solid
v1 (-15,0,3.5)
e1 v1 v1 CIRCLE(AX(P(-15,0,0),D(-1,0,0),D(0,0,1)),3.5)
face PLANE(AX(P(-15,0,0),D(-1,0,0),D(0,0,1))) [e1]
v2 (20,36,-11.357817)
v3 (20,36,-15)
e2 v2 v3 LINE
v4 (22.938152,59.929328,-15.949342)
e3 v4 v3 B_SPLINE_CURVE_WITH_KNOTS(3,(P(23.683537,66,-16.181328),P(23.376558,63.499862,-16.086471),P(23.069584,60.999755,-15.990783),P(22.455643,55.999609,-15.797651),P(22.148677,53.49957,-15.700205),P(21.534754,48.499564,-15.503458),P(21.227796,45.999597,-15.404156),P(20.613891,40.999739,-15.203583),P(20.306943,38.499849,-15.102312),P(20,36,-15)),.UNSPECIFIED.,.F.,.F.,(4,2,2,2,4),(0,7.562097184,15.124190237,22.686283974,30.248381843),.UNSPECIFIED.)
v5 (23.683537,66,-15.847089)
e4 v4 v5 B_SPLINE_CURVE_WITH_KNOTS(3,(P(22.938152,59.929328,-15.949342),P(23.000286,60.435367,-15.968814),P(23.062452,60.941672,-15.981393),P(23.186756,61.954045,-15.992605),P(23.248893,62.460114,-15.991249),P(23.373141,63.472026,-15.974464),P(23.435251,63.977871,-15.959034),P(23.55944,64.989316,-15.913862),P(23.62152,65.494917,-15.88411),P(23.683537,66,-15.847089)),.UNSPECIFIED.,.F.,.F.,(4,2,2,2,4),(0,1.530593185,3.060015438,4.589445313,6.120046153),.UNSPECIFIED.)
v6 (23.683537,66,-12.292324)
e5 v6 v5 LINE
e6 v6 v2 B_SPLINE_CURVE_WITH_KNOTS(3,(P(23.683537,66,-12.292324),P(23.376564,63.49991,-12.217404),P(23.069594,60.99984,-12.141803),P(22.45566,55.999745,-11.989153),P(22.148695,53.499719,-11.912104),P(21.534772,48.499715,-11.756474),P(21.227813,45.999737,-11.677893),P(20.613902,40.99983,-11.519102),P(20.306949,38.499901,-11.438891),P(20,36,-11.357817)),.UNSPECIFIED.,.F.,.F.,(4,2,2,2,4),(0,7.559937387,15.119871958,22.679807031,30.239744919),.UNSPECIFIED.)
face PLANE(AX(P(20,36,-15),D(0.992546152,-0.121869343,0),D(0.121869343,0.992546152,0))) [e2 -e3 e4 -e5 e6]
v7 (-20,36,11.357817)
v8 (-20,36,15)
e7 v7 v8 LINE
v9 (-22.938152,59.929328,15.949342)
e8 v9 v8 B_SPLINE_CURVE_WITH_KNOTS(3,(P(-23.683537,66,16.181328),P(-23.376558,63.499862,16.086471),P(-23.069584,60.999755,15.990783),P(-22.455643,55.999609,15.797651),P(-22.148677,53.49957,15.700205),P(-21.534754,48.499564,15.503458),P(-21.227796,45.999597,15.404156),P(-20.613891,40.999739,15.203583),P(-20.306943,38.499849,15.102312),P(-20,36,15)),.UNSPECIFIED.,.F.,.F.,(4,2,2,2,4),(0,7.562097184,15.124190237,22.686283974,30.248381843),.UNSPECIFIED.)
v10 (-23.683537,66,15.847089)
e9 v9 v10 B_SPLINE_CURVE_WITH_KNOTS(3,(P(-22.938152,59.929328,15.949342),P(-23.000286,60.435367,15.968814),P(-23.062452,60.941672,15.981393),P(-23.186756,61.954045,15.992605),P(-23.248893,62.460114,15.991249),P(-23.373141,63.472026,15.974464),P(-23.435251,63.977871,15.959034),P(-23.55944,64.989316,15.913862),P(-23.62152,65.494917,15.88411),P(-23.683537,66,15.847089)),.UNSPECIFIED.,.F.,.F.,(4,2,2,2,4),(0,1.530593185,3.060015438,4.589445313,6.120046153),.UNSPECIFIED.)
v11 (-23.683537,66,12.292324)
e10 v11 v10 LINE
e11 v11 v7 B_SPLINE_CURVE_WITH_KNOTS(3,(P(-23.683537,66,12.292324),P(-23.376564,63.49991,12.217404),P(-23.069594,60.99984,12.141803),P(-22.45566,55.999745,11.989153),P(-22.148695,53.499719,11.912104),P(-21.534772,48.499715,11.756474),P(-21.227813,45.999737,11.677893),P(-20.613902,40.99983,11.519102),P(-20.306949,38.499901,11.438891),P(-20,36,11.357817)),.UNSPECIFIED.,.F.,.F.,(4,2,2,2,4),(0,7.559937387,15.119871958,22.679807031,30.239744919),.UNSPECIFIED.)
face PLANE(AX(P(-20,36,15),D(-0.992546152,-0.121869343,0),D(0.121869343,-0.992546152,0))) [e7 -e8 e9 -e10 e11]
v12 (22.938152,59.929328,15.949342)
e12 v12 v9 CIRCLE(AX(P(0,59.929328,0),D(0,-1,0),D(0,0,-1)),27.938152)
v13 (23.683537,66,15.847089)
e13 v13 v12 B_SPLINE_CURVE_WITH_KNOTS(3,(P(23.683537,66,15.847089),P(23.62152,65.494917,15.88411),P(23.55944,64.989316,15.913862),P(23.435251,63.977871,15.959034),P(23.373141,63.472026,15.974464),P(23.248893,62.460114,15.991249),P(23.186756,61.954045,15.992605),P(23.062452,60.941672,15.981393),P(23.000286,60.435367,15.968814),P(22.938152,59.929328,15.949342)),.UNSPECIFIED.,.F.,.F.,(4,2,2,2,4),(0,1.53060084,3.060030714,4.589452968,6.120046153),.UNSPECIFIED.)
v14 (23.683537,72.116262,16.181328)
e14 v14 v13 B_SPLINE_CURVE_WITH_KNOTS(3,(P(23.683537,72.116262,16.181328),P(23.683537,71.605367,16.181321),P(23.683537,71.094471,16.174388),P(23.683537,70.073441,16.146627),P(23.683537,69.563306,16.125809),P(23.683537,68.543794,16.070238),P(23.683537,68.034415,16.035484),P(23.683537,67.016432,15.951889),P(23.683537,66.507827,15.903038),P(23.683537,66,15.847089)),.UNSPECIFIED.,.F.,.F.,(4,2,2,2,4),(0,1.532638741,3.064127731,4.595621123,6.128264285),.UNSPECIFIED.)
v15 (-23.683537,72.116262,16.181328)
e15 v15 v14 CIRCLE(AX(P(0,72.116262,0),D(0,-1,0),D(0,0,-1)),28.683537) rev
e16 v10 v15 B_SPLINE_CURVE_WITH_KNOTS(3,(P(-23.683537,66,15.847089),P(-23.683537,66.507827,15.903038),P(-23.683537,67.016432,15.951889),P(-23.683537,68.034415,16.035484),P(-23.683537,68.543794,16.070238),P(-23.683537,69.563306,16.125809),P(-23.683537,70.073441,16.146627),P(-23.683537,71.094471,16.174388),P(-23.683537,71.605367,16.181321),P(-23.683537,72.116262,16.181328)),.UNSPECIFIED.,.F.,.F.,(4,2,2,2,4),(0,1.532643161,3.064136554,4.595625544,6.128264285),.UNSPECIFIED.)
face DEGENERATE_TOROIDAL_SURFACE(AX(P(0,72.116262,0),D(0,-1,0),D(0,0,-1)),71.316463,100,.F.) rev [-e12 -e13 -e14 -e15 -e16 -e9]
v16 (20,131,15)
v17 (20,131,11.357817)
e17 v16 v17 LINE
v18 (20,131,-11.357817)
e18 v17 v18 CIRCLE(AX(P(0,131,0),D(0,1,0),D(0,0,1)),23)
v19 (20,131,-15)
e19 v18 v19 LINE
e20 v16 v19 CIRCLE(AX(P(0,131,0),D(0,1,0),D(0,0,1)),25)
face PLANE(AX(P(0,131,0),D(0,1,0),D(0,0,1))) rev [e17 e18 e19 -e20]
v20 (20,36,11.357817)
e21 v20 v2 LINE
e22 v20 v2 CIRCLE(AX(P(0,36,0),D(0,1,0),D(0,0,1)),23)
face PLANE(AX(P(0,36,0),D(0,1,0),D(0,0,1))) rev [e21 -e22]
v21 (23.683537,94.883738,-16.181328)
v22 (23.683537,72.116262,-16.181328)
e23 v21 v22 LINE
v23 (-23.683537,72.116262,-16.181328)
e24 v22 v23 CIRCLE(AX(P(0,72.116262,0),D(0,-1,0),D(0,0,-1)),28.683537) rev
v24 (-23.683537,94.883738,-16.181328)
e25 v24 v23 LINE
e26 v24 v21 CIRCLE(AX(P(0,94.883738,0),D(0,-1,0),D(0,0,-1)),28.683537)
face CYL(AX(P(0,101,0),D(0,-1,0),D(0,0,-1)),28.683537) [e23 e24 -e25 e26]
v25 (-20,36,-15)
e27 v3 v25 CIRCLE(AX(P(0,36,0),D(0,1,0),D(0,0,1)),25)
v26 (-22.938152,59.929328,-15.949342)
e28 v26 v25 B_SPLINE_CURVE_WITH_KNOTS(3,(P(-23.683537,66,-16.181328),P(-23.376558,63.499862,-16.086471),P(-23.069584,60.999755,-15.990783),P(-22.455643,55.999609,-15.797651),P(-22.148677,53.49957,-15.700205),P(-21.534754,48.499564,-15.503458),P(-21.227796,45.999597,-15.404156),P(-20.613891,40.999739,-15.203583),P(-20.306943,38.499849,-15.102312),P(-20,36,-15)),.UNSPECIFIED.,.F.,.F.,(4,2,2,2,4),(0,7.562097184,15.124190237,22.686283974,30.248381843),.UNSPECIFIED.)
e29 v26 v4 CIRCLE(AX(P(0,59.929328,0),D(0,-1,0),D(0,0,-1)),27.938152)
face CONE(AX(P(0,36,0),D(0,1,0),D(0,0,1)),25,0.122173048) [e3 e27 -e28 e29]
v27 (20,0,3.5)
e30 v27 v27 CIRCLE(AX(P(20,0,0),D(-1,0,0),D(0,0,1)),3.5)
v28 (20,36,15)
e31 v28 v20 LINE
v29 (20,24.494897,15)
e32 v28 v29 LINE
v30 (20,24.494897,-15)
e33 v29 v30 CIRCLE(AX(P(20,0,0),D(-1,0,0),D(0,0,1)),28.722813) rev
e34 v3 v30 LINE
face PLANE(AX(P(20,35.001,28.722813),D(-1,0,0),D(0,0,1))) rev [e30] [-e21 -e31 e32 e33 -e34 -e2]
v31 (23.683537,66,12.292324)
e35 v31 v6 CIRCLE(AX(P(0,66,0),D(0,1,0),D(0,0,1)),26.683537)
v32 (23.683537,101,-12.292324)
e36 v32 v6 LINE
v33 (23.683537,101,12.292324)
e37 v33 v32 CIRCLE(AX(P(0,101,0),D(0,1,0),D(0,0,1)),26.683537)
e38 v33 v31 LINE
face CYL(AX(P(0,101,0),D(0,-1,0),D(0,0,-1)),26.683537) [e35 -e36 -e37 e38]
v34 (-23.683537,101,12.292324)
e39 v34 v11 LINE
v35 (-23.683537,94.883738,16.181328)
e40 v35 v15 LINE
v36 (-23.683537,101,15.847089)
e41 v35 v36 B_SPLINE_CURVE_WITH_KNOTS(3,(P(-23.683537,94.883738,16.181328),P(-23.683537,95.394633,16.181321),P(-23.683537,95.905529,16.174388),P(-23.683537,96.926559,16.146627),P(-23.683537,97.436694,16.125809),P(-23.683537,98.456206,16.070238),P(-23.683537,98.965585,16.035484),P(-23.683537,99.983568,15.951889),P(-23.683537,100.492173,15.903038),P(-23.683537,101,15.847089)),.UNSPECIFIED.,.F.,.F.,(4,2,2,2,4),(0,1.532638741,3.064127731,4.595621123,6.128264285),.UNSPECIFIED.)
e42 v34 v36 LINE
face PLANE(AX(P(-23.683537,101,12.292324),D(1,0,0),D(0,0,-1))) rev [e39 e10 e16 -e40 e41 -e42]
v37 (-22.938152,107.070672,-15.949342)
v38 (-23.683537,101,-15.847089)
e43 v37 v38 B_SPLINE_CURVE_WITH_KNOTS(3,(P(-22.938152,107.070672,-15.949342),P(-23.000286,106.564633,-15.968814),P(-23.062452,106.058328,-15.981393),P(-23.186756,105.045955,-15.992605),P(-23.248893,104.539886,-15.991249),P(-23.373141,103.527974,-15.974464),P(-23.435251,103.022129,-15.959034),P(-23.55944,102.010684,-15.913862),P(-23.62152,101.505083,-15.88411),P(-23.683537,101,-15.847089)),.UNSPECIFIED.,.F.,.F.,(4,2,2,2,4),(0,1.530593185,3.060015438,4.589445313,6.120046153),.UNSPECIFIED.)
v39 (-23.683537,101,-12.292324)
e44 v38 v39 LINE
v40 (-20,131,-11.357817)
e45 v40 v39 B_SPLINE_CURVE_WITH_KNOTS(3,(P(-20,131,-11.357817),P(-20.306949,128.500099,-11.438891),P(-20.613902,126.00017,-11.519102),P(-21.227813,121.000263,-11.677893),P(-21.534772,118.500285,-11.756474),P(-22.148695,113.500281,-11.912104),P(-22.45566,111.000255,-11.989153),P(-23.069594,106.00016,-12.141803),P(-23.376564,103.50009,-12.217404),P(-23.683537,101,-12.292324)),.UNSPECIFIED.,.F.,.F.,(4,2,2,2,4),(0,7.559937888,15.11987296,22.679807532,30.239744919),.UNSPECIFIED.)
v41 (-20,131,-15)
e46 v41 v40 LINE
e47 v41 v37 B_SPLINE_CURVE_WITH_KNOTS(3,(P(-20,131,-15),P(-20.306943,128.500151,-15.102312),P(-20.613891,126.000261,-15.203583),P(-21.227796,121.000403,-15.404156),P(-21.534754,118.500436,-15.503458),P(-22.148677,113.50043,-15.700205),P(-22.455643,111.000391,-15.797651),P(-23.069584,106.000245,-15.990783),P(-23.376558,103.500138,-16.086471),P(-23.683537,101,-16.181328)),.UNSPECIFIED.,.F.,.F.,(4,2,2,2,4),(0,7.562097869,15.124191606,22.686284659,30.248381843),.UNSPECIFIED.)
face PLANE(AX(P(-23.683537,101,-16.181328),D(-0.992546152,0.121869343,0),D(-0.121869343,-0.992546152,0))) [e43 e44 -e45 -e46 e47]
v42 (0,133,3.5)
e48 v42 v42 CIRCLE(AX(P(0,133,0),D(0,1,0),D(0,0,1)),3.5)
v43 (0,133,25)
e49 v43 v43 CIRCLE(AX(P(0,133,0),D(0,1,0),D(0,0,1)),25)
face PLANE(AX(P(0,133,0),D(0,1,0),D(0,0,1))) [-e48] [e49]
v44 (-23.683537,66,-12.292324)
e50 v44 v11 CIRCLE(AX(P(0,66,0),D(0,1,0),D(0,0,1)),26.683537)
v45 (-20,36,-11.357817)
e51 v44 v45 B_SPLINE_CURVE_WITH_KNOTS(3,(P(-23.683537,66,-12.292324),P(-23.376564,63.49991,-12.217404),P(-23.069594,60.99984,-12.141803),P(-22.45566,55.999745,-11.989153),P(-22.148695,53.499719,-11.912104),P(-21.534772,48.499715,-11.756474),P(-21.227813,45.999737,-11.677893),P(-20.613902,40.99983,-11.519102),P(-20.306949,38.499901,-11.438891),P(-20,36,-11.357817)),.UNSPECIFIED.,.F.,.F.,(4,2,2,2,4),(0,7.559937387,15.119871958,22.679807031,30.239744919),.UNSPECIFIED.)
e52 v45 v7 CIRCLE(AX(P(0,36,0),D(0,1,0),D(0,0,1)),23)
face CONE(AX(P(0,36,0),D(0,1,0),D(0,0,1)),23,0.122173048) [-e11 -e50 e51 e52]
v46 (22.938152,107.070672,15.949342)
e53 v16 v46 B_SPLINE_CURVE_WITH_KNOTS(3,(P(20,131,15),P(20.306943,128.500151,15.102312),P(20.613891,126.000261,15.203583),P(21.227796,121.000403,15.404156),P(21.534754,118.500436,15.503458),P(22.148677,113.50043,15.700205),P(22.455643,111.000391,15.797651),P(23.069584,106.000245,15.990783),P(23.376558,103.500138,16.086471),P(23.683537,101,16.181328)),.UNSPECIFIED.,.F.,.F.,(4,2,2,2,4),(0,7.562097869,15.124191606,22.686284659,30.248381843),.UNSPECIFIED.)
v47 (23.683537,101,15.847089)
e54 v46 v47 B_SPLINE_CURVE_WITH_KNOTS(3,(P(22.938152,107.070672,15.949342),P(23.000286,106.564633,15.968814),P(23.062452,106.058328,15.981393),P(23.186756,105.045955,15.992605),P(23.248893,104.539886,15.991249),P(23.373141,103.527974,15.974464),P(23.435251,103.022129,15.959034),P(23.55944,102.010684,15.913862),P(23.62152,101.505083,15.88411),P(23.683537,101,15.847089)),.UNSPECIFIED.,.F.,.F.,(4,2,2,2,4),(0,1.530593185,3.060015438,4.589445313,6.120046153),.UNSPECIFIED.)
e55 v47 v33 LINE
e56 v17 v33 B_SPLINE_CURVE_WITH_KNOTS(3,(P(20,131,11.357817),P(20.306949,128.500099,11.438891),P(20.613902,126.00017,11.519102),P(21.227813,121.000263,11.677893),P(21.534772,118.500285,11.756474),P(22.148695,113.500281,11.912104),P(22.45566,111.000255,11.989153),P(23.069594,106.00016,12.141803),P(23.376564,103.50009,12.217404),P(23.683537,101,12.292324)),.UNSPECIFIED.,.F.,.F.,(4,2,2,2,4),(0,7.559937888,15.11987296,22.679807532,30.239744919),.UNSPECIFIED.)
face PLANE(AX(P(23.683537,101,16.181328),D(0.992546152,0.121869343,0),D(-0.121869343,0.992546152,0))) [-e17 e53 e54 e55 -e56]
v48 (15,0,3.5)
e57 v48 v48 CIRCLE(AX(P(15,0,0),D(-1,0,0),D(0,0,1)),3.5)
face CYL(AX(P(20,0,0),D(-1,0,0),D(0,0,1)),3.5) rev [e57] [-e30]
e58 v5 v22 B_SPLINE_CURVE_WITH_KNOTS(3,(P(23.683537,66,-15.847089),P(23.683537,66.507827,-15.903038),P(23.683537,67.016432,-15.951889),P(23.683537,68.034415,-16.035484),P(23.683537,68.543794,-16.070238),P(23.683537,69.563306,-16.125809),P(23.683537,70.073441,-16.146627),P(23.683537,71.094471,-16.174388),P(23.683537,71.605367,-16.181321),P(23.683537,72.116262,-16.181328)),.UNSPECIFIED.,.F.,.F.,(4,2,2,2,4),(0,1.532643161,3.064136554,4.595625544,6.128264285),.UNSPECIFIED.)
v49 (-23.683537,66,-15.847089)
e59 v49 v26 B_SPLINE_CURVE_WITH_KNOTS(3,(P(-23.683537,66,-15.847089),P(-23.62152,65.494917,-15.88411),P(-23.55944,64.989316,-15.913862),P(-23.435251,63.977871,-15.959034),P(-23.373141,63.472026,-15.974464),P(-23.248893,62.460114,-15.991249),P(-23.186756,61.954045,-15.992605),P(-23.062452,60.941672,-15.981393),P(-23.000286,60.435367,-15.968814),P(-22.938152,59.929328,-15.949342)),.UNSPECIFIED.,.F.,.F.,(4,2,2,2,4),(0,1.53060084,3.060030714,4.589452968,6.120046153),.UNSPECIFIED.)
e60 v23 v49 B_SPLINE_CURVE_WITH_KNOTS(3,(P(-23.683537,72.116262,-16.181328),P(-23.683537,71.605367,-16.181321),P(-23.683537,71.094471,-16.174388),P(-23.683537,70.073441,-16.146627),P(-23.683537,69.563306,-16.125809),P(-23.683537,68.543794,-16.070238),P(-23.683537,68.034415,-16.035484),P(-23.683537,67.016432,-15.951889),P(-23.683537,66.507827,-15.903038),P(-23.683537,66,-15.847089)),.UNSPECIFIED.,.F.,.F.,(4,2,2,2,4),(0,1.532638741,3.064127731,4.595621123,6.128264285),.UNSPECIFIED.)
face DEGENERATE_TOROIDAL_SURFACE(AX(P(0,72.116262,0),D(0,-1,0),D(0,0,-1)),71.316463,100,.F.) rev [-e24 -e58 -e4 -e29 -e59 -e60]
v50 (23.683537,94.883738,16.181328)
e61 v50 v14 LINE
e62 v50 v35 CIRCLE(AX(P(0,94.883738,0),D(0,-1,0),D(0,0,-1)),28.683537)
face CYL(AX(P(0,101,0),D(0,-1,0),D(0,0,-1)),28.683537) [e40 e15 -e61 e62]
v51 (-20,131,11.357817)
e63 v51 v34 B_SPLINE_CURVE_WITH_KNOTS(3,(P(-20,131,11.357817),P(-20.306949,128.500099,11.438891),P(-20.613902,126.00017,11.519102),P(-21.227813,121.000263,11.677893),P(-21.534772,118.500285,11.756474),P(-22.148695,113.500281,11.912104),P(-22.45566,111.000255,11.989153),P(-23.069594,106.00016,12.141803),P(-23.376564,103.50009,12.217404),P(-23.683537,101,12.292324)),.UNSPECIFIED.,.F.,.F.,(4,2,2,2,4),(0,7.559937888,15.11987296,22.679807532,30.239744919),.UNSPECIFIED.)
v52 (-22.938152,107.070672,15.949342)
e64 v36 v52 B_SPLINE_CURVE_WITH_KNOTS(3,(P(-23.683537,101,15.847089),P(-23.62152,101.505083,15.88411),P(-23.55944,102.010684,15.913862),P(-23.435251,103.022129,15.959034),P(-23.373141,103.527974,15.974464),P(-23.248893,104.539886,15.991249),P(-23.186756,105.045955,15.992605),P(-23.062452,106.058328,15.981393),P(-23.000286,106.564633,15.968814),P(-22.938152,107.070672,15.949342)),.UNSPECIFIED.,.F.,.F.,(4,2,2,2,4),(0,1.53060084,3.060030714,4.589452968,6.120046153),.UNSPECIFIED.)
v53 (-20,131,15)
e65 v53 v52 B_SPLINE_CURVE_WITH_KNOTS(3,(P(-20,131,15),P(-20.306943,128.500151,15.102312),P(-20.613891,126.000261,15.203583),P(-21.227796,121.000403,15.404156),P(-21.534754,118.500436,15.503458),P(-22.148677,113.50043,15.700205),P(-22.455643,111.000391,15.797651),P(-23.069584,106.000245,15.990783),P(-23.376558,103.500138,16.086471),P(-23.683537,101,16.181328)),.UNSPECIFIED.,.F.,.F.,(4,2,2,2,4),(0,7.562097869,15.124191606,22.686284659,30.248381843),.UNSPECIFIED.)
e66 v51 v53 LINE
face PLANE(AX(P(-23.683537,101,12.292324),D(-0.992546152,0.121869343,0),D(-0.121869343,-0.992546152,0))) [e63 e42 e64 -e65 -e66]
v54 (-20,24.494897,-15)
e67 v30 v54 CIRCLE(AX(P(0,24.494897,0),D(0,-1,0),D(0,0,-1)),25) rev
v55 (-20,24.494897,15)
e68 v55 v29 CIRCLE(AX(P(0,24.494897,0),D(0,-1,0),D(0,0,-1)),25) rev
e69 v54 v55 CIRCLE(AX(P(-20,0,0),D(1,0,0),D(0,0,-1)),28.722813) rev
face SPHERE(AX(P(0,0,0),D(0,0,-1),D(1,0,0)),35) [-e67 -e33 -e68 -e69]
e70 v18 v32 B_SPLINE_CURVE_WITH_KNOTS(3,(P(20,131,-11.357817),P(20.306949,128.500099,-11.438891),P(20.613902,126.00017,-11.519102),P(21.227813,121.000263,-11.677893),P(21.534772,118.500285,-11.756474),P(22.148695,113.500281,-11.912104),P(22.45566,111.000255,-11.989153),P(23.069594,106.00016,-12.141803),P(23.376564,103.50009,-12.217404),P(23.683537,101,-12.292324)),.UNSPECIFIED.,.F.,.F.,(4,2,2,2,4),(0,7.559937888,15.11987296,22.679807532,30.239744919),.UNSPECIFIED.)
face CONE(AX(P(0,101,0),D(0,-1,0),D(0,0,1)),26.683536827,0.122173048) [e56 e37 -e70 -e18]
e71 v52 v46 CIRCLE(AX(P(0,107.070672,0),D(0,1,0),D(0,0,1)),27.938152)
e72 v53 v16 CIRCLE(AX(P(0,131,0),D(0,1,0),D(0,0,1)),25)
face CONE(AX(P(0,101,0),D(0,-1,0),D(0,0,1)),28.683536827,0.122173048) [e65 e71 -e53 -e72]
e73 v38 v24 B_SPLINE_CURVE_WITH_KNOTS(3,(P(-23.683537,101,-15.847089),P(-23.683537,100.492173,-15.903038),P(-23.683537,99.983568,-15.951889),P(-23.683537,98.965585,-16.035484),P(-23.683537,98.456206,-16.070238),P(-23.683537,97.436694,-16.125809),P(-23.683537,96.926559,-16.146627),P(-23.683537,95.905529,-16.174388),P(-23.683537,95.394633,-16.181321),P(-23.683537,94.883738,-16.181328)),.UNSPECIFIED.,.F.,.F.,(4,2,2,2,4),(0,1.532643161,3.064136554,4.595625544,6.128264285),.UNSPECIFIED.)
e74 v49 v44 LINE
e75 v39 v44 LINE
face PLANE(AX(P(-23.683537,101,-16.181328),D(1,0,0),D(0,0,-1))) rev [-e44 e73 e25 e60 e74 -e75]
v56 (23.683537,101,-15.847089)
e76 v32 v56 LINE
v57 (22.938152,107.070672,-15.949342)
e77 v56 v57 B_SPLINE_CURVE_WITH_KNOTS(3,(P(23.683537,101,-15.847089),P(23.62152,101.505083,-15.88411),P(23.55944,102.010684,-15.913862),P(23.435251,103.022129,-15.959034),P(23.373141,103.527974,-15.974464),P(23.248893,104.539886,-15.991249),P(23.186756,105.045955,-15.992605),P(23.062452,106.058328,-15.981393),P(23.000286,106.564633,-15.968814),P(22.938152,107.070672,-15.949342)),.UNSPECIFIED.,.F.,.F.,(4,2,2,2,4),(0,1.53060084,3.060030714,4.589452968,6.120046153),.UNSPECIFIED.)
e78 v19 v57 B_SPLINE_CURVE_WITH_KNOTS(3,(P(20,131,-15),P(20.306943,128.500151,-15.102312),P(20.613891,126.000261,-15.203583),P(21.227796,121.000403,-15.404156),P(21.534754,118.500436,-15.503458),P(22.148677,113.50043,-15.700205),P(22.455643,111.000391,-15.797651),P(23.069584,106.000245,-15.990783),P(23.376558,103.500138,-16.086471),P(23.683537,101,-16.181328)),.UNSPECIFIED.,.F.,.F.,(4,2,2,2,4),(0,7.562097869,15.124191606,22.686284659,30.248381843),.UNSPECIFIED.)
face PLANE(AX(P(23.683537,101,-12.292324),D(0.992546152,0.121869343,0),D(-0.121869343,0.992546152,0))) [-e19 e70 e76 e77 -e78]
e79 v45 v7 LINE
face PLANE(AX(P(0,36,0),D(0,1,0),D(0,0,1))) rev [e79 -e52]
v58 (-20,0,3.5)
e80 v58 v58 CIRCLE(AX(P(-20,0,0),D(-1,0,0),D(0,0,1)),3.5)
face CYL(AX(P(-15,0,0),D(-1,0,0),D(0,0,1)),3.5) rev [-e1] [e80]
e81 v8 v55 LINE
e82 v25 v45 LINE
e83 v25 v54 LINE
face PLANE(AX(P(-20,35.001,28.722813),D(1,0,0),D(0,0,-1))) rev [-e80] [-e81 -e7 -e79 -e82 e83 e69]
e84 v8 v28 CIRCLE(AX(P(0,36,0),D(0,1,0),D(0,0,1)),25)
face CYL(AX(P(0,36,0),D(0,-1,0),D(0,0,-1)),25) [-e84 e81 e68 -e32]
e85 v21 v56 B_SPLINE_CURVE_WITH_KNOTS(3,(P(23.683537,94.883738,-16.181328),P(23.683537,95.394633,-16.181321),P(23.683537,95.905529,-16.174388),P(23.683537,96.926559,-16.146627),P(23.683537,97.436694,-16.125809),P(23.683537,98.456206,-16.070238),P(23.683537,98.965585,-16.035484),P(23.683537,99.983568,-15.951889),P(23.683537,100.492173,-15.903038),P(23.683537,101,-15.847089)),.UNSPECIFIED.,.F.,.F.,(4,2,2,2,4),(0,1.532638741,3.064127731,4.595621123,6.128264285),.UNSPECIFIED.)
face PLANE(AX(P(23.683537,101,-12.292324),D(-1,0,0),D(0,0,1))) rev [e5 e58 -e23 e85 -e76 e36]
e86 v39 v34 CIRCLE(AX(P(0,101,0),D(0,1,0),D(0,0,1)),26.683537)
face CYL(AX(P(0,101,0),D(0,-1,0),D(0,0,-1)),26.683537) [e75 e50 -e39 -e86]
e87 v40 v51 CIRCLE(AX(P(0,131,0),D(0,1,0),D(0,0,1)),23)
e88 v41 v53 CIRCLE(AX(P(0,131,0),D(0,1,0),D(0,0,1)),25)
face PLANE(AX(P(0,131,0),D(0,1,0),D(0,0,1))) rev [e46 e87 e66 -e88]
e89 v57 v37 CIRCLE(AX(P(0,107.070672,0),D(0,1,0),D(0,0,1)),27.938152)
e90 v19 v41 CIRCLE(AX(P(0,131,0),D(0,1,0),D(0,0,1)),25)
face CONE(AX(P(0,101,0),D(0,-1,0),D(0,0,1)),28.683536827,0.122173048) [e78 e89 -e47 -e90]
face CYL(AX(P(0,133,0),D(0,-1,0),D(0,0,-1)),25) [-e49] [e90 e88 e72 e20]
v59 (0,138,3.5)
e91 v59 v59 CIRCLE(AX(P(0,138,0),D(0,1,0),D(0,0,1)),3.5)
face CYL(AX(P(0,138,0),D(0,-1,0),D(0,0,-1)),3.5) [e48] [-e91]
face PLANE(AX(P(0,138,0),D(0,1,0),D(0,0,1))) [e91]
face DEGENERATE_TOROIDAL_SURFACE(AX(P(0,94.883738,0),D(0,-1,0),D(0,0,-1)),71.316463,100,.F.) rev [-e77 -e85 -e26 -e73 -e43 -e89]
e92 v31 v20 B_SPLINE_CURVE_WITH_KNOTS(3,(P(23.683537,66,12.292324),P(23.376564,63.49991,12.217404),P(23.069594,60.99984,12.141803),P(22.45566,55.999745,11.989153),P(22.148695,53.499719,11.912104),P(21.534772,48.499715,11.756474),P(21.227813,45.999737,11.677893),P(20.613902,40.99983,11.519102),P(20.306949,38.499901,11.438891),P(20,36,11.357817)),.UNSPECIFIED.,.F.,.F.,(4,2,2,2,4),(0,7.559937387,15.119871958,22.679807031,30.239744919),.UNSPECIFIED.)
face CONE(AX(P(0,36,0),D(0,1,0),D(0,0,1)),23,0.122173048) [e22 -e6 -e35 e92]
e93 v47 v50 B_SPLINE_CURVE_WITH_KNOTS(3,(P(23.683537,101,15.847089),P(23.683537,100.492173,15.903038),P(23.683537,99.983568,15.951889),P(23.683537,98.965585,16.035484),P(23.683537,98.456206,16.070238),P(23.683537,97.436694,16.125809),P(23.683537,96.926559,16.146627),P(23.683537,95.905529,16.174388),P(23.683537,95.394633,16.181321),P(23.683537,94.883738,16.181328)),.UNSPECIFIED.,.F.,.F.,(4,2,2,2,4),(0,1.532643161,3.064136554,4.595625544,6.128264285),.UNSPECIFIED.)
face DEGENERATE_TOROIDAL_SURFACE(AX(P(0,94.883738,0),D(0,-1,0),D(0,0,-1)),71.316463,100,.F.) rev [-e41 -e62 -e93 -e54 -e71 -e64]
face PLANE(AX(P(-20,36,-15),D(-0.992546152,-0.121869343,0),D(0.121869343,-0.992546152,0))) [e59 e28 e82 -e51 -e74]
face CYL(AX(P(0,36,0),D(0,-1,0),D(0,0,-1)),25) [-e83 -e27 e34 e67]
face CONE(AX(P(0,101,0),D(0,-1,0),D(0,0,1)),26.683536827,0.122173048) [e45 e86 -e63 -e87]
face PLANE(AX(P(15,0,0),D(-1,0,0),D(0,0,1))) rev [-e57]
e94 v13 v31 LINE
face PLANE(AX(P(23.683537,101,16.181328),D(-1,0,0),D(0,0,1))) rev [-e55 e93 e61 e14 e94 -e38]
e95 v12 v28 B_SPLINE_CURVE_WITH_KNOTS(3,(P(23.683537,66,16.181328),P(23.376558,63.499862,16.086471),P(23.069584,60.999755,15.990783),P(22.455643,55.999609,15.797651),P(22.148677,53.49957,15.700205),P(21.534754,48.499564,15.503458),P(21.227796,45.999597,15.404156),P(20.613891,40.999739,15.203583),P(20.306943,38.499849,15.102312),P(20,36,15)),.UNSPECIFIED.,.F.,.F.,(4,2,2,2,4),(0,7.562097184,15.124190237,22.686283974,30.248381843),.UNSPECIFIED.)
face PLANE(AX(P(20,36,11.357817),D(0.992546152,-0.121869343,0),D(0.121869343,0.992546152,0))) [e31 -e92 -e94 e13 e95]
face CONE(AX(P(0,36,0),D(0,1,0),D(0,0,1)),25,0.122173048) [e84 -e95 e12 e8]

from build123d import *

# Parameters (mm, degrees)
CUT_EXTRUDE1_START  = -28.722813
SKETCH2_OUTSIDE_W   = 96.248
SKETCH2_OUTSIDE_H   = 96.248
CUT_EXTRUDE1_DEPTH  = 57.445626
BOSS_EXTRUDE1_DEPTH = 36
SKETCH4_R           = 3.5
CUT_EXTRUDE2_DEPTH  = 5
LPATTERN1_COUNT     = 2
LPATTERN1_PITCH     = 35
BOSS_EXTRUDE2_DEPTH = 30
BOSS_EXTRUDE2_DRAFT = -7
BOSS_EXTRUDE6_DEPTH = 35
BOSS_EXTRUDE9_DEPTH = 30
BOSS_EXTRUDE9_DRAFT = 7
SKETCH10_R          = 25
BOSS_EXTRUDE7_DEPTH = 2
SKETCH11_R          = 3.5
BOSS_EXTRUDE8_DEPTH = 5
FILLET3_R           = 100


with BuildPart() as part:
    # Sketch1 → Revolve2 (revolve)
    with BuildSketch(Plane(origin=(0, 0, 0), x_dir=(1, 0, 0), z_dir=(0, 1, 0))):
        with BuildLine():
            Line((0, 35), (0, -35))
            ThreePointArc((0, -35), (35, 0), (0, 35))
        make_face()
    revolve(axis=Axis((0, 0, -35), (0, 0, 1)))

    # Sketch2 outside → Cut-Extrude1 (cut)
    with BuildSketch(Plane(origin=(0, 0, 0), x_dir=(1, 0, 0), z_dir=(0, 1, 0)).offset(CUT_EXTRUDE1_START)):
        Rectangle(SKETCH2_OUTSIDE_W, SKETCH2_OUTSIDE_H)
        with BuildLine():
            Line((-20, -28.722813233), (-20, 28.722813233))
            ThreePointArc((-20, 28.722813233), (0, 35), (20, 28.722813233))
            Line((20, 28.722813233), (20, -28.722813233))
            ThreePointArc((20, -28.722813233), (0, -35), (-20, -28.722813233))
        make_face(mode=Mode.SUBTRACT)
    extrude(amount=CUT_EXTRUDE1_DEPTH, mode=Mode.SUBTRACT)

    # Sketch3 → Boss-Extrude1 (add)
    with BuildSketch(Plane(origin=(0, 0, 0), x_dir=(1, 0, 0), z_dir=(0, 1, 0))):
        with BuildLine():
            Line((-20, 15), (-20, -15))
            ThreePointArc((-20, -15), (0, -25), (20, -15))
            Line((20, -15), (20, 15))
            ThreePointArc((20, 15), (0, 25), (-20, 15))
        make_face()
    extrude(amount=BOSS_EXTRUDE1_DEPTH)

    # Sketch4 → Cut-Extrude2 (cut)
    with BuildSketch(Plane.ZY.offset(20)):
        Circle(SKETCH4_R)
    cut_extrude2 = extrude(amount=-CUT_EXTRUDE2_DEPTH, mode=Mode.SUBTRACT)

    # LPattern1: Cut-Extrude2 ×2
    with Locations(*[(i * LPATTERN1_PITCH, 0, 0) for i in range(1, LPATTERN1_COUNT)]):
        add(cut_extrude2, mode=Mode.SUBTRACT)


with BuildPart() as boss_extrude2_tool:
    # Sketch5 → Boss-Extrude2 (with draft: the straight prism first)
    with BuildSketch(Plane(origin=(0, 36, 0), x_dir=(1, 0, 0), z_dir=(0, 1, 0))):
        with BuildLine():
            Line((-20, 15), (-20, 11.357816692))
            ThreePointArc((-20, 11.357816692), (-23, 0), (-20, -11.357816692))
            Line((-20, -11.357816692), (-20, -15))
            ThreePointArc((-20, -15), (0, -25), (20, -15))
            Line((20, -15), (20, -11.357816692))
            ThreePointArc((20, -11.357816692), (23, 0), (20, 11.357816692))
            Line((20, 11.357816692), (20, 15))
            ThreePointArc((20, 15), (0, 25), (-20, 15))
        make_face()
    extrude(amount=BOSS_EXTRUDE2_DEPTH)
    # Boss-Extrude2: the draft: its side faces are tilted about the plane it starts from
    boss_extrude2_sides = [boss_extrude2_tool.faces().sort_by_distance(p)[0] for p in [
        (20, 51, -13.178908346),
        (0, 51, -25),
        (-20, 51, -13.178908346),
        (-23, 51, 0),
        (-20, 51, 13.178908346),
        (0, 51, 25),
        (20, 51, 13.178908346),
        (23, 51, 0),
    ]]
    draft(boss_extrude2_sides, Plane(origin=(0, 36, 0), x_dir=(1, 0, 0), z_dir=(0, 1, 0)), BOSS_EXTRUDE2_DRAFT)


with BuildPart() as part_1:
    add(part.part)

    # Boss-Extrude2: add boss_extrude2_tool
    add(boss_extrude2_tool.part)

    # Sketch9 → Boss-Extrude6 (add)
    with BuildSketch(Plane(origin=(0, 66, 0), x_dir=(1, 0, 0), z_dir=(0, 1, 0))):
        with BuildLine():
            Line((23.683536827, 12.29232366), (23.683536827, 16.181327766))
            ThreePointArc((23.683536827, 16.181327766), (0, 28.683536827), (-23.683536827, 16.181327766))
            Line((-23.683536827, 16.181327766), (-23.683536827, 12.29232366))
            ThreePointArc((-23.683536827, 12.29232366), (-26.683536827, 0), (-23.683536827, -12.29232366))
            Line((-23.683536827, -12.29232366), (-23.683536827, -16.181327766))
            ThreePointArc((-23.683536827, -16.181327766), (0, -28.683536827), (23.683536827, -16.181327766))
            Line((23.683536827, -16.181327766), (23.683536827, -12.29232366))
            ThreePointArc((23.683536827, -12.29232366), (26.683536827, 0), (23.683536827, 12.29232366))
        make_face()
    extrude(amount=BOSS_EXTRUDE6_DEPTH)


with BuildPart() as boss_extrude9_tool:
    # Sketch12 → Boss-Extrude9 (with draft: the straight prism first)
    with BuildSketch(Plane(origin=(0, 101, 0), x_dir=(1, 0, 0), z_dir=(0, 1, 0))):
        with BuildLine():
            Line((23.683536827, 12.29232366), (23.683536827, 16.181327766))
            ThreePointArc((23.683536827, 16.181327766), (0, 28.683536827), (-23.683536827, 16.181327766))
            Line((-23.683536827, 16.181327766), (-23.683536827, 12.29232366))
            ThreePointArc((-23.683536827, 12.29232366), (-26.683536827, 0), (-23.683536827, -12.29232366))
            Line((-23.683536827, -12.29232366), (-23.683536827, -16.181327766))
            ThreePointArc((-23.683536827, -16.181327766), (0, -28.683536827), (23.683536827, -16.181327766))
            Line((23.683536827, -16.181327766), (23.683536827, -12.29232366))
            ThreePointArc((23.683536827, -12.29232366), (26.683536827, 0), (23.683536827, 12.29232366))
        make_face()
    extrude(amount=BOSS_EXTRUDE9_DEPTH)
    # Boss-Extrude9: the draft: its side faces are tilted about the plane it starts from
    boss_extrude9_sides = [boss_extrude9_tool.faces().sort_by_distance(p)[0] for p in [
        (0, 116, 28.683536827),
        (23.683536827, 116, 14.236825713),
        (26.683536827, 116, 0),
        (23.683536827, 116, -14.236825713),
        (0, 116, -28.683536827),
        (-23.683536827, 116, -14.236825713),
        (-26.683536827, 116, 0),
        (-23.683536827, 116, 14.236825713),
    ]]
    draft(boss_extrude9_sides, Plane(origin=(0, 101, 0), x_dir=(1, 0, 0), z_dir=(0, 1, 0)), BOSS_EXTRUDE9_DRAFT)


with BuildPart() as part_2:
    add(part_1.part)

    # Boss-Extrude9: add boss_extrude9_tool
    add(boss_extrude9_tool.part)

    # Sketch10 → Boss-Extrude7 (add)
    with BuildSketch(Plane(origin=(0, 131, 0), x_dir=(1, 0, 0), z_dir=(0, 1, 0))):
        with Locations(Location((0, 0, 0), (0, 0, 36.869897646))):
            Circle(SKETCH10_R)
    extrude(amount=BOSS_EXTRUDE7_DEPTH)

    # Sketch11 → Boss-Extrude8 (add)
    with BuildSketch(Plane(origin=(0, 133, 0), x_dir=(1, 0, 0), z_dir=(0, 1, 0))):
        with Locations(Location((0, 0, 0), (0, 0, 270))):
            Circle(SKETCH11_R)
    extrude(amount=BOSS_EXTRUDE8_DEPTH)

    # Fillet3
    # the kernel refuses this fillet: 100 mm, written as the material it takes off along each edge
    with BuildSketch(Plane(origin=(0, 66, 0), x_dir=(0.9978245122586105, 0, -0.06592603989218485), z_dir=(0.06592603989218485, 0, 0.9978245122586105))) as fillet3_piece_1:
        with BuildLine():
            CenterArc((28.683536827 - FILLET3_R, FILLET3_R * 0.0611626201505), FILLET3_R, 353, 7)
            Line((28.683536827, FILLET3_R * 0.0611626201505), (28.683536827, 0))
            Line((28.683536827, 0), (28.683536827 - FILLET3_R * 0.00745384835868, -FILLET3_R * 0.0607067232547))
        make_face()
    revolve(axis=Axis((0, 66, 0), (0, 1, 0)), revolution_arc=172.439949247, mode=Mode.SUBTRACT)
    with BuildSketch(Plane(origin=(0, 101, 0), x_dir=(0.9978245122586106, 0, -0.06592603989218539), z_dir=(0.06592603989218539, 0, 0.9978245122586106))) as fillet3_piece_2:
        with BuildLine():
            CenterArc((28.683536827 - FILLET3_R, -FILLET3_R * 0.0611626201505), FILLET3_R, 0, 7)
            Line((28.683536827 - FILLET3_R * 0.00745384835868, FILLET3_R * 0.0607067232547), (28.683536827, 0))
            Line((28.683536827, 0), (28.683536827, -FILLET3_R * 0.0611626201505))
        make_face()
    revolve(axis=Axis((0, 101, 0), (0, 1, 0)), revolution_arc=172.439949247, mode=Mode.SUBTRACT)
    with BuildSketch(Plane(origin=(0, 101, 0), x_dir=(-0.9978245122586106, 0, 0.06592603989218528), z_dir=(-0.06592603989218528, 0, -0.9978245122586106))) as fillet3_piece_3:
        with BuildLine():
            CenterArc((28.683536827 - FILLET3_R, -FILLET3_R * 0.0611626201505), FILLET3_R, 0, 7)
            Line((28.683536827 - FILLET3_R * 0.00745384835868, FILLET3_R * 0.0607067232547), (28.683536827, 0))
            Line((28.683536827, 0), (28.683536827, -FILLET3_R * 0.0611626201505))
        make_face()
    revolve(axis=Axis((0, 101, 0), (0, 1, 0)), revolution_arc=172.439949247, mode=Mode.SUBTRACT)
    with BuildSketch(Plane(origin=(0, 66, 0), x_dir=(-0.9978245122586105, 0, 0.06592603989218485), z_dir=(-0.06592603989218485, 0, -0.9978245122586105))) as fillet3_piece_4:
        with BuildLine():
            CenterArc((28.683536827 - FILLET3_R, FILLET3_R * 0.0611626201505), FILLET3_R, 353, 7)
            Line((28.683536827, FILLET3_R * 0.0611626201505), (28.683536827, 0))
            Line((28.683536827, 0), (28.683536827 - FILLET3_R * 0.00745384835868, -FILLET3_R * 0.0607067232547))
        make_face()
    revolve(axis=Axis((0, 66, 0), (0, 1, 0)), revolution_arc=172.439949247, mode=Mode.SUBTRACT)


solid = part_2.part
